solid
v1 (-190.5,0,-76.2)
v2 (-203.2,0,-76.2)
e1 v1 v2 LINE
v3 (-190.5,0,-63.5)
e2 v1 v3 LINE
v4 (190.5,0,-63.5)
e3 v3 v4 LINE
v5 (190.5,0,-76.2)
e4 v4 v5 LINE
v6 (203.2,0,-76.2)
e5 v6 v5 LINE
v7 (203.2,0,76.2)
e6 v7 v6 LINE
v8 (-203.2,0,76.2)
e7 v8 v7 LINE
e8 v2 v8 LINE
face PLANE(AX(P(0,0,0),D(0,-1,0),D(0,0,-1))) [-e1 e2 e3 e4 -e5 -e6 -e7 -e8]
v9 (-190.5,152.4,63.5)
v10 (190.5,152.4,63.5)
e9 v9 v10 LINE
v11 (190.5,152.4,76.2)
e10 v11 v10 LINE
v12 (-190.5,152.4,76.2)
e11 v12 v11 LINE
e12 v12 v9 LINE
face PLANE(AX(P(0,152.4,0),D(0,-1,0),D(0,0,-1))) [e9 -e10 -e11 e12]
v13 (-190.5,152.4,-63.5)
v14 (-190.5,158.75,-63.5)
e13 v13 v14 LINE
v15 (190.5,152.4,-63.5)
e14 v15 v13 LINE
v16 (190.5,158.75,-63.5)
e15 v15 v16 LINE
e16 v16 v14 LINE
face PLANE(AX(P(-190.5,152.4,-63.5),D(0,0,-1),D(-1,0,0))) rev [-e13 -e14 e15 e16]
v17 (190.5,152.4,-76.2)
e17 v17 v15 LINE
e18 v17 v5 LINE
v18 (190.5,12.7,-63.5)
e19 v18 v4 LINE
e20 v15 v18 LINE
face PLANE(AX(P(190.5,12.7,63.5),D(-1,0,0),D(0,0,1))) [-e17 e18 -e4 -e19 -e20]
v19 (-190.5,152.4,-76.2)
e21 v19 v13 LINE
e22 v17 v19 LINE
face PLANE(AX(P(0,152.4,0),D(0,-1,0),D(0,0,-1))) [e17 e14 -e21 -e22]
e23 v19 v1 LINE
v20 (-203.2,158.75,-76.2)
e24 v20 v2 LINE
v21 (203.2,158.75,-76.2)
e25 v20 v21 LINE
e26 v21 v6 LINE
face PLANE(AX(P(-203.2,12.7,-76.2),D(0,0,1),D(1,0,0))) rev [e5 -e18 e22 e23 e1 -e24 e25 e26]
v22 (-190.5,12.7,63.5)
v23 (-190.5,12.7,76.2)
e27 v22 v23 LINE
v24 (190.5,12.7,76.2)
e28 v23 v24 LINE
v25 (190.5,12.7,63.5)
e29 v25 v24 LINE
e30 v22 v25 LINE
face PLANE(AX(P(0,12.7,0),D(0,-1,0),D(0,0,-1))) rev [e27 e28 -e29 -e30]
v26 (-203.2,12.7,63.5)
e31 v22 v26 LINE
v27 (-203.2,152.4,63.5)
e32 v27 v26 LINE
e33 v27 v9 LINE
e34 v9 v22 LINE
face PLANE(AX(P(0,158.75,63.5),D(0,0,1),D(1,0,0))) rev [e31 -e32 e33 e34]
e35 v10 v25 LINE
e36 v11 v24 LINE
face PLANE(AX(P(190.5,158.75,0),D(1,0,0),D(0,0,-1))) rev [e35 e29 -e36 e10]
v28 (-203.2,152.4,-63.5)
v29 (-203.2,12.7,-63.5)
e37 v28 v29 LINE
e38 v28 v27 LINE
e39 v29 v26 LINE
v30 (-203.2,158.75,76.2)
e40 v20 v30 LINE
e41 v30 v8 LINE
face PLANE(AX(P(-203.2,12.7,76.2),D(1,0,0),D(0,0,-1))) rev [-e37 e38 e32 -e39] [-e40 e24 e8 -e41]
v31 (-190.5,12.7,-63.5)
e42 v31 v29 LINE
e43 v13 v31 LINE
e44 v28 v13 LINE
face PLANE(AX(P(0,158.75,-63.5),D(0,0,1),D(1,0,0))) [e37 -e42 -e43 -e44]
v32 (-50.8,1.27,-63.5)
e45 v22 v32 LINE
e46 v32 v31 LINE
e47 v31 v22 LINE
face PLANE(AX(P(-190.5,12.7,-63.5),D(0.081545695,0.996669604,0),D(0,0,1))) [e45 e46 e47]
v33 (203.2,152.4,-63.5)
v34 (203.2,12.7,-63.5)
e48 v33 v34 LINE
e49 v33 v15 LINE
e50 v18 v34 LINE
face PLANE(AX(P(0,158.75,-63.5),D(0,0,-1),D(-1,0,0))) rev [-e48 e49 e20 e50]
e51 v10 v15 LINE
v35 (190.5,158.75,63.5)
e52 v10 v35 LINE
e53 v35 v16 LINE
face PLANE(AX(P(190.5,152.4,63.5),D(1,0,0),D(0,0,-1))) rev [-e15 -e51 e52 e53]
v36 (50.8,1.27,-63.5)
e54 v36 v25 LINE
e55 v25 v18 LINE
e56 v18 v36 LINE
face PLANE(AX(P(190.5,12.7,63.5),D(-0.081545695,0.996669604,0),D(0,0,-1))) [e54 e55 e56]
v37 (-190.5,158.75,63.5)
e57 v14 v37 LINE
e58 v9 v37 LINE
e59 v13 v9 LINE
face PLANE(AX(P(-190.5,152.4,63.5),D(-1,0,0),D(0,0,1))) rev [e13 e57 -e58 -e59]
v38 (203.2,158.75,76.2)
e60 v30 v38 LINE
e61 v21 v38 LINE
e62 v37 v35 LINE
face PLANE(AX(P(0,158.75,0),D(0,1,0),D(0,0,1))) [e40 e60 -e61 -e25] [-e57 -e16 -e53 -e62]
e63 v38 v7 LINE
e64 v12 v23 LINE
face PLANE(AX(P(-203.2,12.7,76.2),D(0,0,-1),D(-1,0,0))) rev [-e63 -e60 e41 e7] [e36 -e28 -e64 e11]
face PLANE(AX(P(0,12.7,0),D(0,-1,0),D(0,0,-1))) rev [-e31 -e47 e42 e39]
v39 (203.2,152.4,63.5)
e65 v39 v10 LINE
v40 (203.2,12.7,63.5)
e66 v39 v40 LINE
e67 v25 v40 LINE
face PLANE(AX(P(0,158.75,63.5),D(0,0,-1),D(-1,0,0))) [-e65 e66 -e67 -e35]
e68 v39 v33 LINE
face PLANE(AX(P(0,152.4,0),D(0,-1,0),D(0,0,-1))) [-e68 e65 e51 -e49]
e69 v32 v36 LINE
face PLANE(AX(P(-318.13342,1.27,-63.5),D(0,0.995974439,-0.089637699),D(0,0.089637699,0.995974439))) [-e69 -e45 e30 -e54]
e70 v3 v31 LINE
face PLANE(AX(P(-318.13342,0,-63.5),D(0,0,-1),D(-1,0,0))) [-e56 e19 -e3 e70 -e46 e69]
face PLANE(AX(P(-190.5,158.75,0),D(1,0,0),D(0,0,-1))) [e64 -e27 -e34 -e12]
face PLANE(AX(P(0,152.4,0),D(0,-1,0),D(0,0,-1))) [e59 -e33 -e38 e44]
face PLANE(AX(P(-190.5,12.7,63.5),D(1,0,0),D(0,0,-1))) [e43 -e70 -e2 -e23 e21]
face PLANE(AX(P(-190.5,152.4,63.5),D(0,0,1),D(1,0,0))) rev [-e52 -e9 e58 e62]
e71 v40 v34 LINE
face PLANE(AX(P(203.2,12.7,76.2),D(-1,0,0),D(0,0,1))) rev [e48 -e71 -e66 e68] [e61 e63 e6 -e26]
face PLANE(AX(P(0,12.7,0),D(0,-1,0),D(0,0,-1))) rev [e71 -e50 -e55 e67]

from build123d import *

# Parameters (mm, degrees)
SKETCH1_W                                  = 406.4
SKETCH1_H                                  = 152.4
SKETCH1_W_2                                = 381
SKETCH1_H_2                                = 127
BOSS_EXTRUDE1_DEPTH                        = 12.7
SKETCH2_W                                  = 12.7
SKETCH2_H                                  = 12.7
BOSS_EXTRUDE2_DEPTH                        = 146.05
MIRROR1_AT_THE_SECOND_PLANE_COPY_1_SKETC_W = 12.7
MIRROR1_AT_THE_SECOND_PLANE_COPY_1_SKETC_H = 12.7
MIRROR1_AT_THE_SECOND_PLANE_COPY_1_DEPTH   = 146.05
SKETCH3_W                                  = 406.4
SKETCH3_H                                  = 152.4
SKETCH3_W_2                                = 381
SKETCH3_H_2                                = 127
BOSS_EXTRUDE3_DEPTH                        = 6.35
SKETCH6_W                                  = 12.7
SKETCH6_H                                  = 12.7
CUT_EXTRUDE1_DEPTH                         = 381
BOSS_EXTRUDE5_DEPTH                        = 381
CUT_EXTRUDE3_DEPTH                         = 262.586090035
LOFT2_START                                = -63.5
LOFT2_DEPTH                                = 127
LOFT3_START                                = -63.5
LOFT3_DEPTH                                = 127


# Read off the part's stored shape, not the designer's step: Loft2, Loft3
with BuildPart() as part:
    # Sketch1 → Boss-Extrude1 (new body)
    with BuildSketch(Plane(origin=(0, 0, 0), x_dir=(1, 0, 0), z_dir=(0, 1, 0))):
        Rectangle(SKETCH1_W, SKETCH1_H)
        Rectangle(SKETCH1_W_2, SKETCH1_H_2, mode=Mode.SUBTRACT)
    extrude(amount=BOSS_EXTRUDE1_DEPTH)

    # Sketch2 → Boss-Extrude2 (add)
    with BuildSketch(Plane(origin=(0, 12.7, 0), x_dir=(1, 0, 0), z_dir=(0, 1, 0))):
        with Locations((-196.85, -69.85)):
            Rectangle(SKETCH2_W, SKETCH2_H)
    boss_extrude2 = extrude(amount=BOSS_EXTRUDE2_DEPTH)

    # Mirror1: Boss-Extrude2 across plane
    add(boss_extrude2.mirror(Plane(origin=(0, 0, 0), x_dir=(0, 0, 1), z_dir=(1, 0, 0))))

    # Mirror1 at the second plane: Boss-Extrude2 across plane
    add(boss_extrude2.mirror(Plane.XY))

    # Mirror1 at the second plane copy 1 sketc → Mirror1 at the second plane copy 1 (add)
    with BuildSketch(Plane(origin=(0, 12.7, 0), x_dir=(-1, 0, 0), z_dir=(0, 1, 0))):
        with Locations((-196.85, -69.85)):
            Rectangle(MIRROR1_AT_THE_SECOND_PLANE_COPY_1_SKETC_W, MIRROR1_AT_THE_SECOND_PLANE_COPY_1_SKETC_H)
    extrude(amount=MIRROR1_AT_THE_SECOND_PLANE_COPY_1_DEPTH)

    # Sketch3 → Boss-Extrude3 (add)
    with BuildSketch(Plane(origin=(0, 158.75, 0), x_dir=(1, 0, 0), z_dir=(0, 1, 0))):
        Rectangle(SKETCH3_W, SKETCH3_H)
        Rectangle(SKETCH3_W_2, SKETCH3_H_2, mode=Mode.SUBTRACT)
    extrude(amount=-BOSS_EXTRUDE3_DEPTH)

    # Sketch6 → Cut-Extrude1 (cut)
    with BuildSketch(Plane.ZY.offset(-190.5)):
        with Locations((-69.85, 6.35)):
            Rectangle(SKETCH6_W, SKETCH6_H)
    extrude(amount=CUT_EXTRUDE1_DEPTH, mode=Mode.SUBTRACT)

    # Sketch4 → Boss-Extrude5 (add)
    with BuildSketch(Plane.ZY.offset(-190.5)):
        Polygon((-63.5, 0), (63.5, 0), (63.5, 12.7), (-63.5, 1.27), align=None)
    extrude(amount=BOSS_EXTRUDE5_DEPTH)

    # Sketch10 → Cut-Extrude3 (cut, through all)
    with BuildSketch(Plane(origin=(0, 12.7, 0), x_dir=(1, 0, 0), z_dir=(0, 1, 0))):
        Polygon((-190.5, -63.5), (-190.5, 63.5), (-50.8, 63.5), align=None)
        Polygon((190.5, -63.5), (190.5, 63.5), (50.8, 63.5), align=None)
    extrude(amount=-CUT_EXTRUDE3_DEPTH, mode=Mode.SUBTRACT)

    # Loft2 outline → Loft2 (add)
    with BuildSketch(Plane.XY.offset(LOFT2_START)):
        Polygon((49, 1.122727273), (49, 0), (190.5, 0), (190.5, 12.7), (50.8, 1.27), align=None)
    extrude(amount=LOFT2_DEPTH)

    # Loft3 outline → Loft3 (add)
    with BuildSketch(Plane.XY.offset(LOFT3_START)):
        Polygon((-190.5, 12.7), (-190.5, 0), (-49, 0), (-49, 1.122727273), (-50.8, 1.27), align=None)
    extrude(amount=LOFT3_DEPTH)


solid = part.part
